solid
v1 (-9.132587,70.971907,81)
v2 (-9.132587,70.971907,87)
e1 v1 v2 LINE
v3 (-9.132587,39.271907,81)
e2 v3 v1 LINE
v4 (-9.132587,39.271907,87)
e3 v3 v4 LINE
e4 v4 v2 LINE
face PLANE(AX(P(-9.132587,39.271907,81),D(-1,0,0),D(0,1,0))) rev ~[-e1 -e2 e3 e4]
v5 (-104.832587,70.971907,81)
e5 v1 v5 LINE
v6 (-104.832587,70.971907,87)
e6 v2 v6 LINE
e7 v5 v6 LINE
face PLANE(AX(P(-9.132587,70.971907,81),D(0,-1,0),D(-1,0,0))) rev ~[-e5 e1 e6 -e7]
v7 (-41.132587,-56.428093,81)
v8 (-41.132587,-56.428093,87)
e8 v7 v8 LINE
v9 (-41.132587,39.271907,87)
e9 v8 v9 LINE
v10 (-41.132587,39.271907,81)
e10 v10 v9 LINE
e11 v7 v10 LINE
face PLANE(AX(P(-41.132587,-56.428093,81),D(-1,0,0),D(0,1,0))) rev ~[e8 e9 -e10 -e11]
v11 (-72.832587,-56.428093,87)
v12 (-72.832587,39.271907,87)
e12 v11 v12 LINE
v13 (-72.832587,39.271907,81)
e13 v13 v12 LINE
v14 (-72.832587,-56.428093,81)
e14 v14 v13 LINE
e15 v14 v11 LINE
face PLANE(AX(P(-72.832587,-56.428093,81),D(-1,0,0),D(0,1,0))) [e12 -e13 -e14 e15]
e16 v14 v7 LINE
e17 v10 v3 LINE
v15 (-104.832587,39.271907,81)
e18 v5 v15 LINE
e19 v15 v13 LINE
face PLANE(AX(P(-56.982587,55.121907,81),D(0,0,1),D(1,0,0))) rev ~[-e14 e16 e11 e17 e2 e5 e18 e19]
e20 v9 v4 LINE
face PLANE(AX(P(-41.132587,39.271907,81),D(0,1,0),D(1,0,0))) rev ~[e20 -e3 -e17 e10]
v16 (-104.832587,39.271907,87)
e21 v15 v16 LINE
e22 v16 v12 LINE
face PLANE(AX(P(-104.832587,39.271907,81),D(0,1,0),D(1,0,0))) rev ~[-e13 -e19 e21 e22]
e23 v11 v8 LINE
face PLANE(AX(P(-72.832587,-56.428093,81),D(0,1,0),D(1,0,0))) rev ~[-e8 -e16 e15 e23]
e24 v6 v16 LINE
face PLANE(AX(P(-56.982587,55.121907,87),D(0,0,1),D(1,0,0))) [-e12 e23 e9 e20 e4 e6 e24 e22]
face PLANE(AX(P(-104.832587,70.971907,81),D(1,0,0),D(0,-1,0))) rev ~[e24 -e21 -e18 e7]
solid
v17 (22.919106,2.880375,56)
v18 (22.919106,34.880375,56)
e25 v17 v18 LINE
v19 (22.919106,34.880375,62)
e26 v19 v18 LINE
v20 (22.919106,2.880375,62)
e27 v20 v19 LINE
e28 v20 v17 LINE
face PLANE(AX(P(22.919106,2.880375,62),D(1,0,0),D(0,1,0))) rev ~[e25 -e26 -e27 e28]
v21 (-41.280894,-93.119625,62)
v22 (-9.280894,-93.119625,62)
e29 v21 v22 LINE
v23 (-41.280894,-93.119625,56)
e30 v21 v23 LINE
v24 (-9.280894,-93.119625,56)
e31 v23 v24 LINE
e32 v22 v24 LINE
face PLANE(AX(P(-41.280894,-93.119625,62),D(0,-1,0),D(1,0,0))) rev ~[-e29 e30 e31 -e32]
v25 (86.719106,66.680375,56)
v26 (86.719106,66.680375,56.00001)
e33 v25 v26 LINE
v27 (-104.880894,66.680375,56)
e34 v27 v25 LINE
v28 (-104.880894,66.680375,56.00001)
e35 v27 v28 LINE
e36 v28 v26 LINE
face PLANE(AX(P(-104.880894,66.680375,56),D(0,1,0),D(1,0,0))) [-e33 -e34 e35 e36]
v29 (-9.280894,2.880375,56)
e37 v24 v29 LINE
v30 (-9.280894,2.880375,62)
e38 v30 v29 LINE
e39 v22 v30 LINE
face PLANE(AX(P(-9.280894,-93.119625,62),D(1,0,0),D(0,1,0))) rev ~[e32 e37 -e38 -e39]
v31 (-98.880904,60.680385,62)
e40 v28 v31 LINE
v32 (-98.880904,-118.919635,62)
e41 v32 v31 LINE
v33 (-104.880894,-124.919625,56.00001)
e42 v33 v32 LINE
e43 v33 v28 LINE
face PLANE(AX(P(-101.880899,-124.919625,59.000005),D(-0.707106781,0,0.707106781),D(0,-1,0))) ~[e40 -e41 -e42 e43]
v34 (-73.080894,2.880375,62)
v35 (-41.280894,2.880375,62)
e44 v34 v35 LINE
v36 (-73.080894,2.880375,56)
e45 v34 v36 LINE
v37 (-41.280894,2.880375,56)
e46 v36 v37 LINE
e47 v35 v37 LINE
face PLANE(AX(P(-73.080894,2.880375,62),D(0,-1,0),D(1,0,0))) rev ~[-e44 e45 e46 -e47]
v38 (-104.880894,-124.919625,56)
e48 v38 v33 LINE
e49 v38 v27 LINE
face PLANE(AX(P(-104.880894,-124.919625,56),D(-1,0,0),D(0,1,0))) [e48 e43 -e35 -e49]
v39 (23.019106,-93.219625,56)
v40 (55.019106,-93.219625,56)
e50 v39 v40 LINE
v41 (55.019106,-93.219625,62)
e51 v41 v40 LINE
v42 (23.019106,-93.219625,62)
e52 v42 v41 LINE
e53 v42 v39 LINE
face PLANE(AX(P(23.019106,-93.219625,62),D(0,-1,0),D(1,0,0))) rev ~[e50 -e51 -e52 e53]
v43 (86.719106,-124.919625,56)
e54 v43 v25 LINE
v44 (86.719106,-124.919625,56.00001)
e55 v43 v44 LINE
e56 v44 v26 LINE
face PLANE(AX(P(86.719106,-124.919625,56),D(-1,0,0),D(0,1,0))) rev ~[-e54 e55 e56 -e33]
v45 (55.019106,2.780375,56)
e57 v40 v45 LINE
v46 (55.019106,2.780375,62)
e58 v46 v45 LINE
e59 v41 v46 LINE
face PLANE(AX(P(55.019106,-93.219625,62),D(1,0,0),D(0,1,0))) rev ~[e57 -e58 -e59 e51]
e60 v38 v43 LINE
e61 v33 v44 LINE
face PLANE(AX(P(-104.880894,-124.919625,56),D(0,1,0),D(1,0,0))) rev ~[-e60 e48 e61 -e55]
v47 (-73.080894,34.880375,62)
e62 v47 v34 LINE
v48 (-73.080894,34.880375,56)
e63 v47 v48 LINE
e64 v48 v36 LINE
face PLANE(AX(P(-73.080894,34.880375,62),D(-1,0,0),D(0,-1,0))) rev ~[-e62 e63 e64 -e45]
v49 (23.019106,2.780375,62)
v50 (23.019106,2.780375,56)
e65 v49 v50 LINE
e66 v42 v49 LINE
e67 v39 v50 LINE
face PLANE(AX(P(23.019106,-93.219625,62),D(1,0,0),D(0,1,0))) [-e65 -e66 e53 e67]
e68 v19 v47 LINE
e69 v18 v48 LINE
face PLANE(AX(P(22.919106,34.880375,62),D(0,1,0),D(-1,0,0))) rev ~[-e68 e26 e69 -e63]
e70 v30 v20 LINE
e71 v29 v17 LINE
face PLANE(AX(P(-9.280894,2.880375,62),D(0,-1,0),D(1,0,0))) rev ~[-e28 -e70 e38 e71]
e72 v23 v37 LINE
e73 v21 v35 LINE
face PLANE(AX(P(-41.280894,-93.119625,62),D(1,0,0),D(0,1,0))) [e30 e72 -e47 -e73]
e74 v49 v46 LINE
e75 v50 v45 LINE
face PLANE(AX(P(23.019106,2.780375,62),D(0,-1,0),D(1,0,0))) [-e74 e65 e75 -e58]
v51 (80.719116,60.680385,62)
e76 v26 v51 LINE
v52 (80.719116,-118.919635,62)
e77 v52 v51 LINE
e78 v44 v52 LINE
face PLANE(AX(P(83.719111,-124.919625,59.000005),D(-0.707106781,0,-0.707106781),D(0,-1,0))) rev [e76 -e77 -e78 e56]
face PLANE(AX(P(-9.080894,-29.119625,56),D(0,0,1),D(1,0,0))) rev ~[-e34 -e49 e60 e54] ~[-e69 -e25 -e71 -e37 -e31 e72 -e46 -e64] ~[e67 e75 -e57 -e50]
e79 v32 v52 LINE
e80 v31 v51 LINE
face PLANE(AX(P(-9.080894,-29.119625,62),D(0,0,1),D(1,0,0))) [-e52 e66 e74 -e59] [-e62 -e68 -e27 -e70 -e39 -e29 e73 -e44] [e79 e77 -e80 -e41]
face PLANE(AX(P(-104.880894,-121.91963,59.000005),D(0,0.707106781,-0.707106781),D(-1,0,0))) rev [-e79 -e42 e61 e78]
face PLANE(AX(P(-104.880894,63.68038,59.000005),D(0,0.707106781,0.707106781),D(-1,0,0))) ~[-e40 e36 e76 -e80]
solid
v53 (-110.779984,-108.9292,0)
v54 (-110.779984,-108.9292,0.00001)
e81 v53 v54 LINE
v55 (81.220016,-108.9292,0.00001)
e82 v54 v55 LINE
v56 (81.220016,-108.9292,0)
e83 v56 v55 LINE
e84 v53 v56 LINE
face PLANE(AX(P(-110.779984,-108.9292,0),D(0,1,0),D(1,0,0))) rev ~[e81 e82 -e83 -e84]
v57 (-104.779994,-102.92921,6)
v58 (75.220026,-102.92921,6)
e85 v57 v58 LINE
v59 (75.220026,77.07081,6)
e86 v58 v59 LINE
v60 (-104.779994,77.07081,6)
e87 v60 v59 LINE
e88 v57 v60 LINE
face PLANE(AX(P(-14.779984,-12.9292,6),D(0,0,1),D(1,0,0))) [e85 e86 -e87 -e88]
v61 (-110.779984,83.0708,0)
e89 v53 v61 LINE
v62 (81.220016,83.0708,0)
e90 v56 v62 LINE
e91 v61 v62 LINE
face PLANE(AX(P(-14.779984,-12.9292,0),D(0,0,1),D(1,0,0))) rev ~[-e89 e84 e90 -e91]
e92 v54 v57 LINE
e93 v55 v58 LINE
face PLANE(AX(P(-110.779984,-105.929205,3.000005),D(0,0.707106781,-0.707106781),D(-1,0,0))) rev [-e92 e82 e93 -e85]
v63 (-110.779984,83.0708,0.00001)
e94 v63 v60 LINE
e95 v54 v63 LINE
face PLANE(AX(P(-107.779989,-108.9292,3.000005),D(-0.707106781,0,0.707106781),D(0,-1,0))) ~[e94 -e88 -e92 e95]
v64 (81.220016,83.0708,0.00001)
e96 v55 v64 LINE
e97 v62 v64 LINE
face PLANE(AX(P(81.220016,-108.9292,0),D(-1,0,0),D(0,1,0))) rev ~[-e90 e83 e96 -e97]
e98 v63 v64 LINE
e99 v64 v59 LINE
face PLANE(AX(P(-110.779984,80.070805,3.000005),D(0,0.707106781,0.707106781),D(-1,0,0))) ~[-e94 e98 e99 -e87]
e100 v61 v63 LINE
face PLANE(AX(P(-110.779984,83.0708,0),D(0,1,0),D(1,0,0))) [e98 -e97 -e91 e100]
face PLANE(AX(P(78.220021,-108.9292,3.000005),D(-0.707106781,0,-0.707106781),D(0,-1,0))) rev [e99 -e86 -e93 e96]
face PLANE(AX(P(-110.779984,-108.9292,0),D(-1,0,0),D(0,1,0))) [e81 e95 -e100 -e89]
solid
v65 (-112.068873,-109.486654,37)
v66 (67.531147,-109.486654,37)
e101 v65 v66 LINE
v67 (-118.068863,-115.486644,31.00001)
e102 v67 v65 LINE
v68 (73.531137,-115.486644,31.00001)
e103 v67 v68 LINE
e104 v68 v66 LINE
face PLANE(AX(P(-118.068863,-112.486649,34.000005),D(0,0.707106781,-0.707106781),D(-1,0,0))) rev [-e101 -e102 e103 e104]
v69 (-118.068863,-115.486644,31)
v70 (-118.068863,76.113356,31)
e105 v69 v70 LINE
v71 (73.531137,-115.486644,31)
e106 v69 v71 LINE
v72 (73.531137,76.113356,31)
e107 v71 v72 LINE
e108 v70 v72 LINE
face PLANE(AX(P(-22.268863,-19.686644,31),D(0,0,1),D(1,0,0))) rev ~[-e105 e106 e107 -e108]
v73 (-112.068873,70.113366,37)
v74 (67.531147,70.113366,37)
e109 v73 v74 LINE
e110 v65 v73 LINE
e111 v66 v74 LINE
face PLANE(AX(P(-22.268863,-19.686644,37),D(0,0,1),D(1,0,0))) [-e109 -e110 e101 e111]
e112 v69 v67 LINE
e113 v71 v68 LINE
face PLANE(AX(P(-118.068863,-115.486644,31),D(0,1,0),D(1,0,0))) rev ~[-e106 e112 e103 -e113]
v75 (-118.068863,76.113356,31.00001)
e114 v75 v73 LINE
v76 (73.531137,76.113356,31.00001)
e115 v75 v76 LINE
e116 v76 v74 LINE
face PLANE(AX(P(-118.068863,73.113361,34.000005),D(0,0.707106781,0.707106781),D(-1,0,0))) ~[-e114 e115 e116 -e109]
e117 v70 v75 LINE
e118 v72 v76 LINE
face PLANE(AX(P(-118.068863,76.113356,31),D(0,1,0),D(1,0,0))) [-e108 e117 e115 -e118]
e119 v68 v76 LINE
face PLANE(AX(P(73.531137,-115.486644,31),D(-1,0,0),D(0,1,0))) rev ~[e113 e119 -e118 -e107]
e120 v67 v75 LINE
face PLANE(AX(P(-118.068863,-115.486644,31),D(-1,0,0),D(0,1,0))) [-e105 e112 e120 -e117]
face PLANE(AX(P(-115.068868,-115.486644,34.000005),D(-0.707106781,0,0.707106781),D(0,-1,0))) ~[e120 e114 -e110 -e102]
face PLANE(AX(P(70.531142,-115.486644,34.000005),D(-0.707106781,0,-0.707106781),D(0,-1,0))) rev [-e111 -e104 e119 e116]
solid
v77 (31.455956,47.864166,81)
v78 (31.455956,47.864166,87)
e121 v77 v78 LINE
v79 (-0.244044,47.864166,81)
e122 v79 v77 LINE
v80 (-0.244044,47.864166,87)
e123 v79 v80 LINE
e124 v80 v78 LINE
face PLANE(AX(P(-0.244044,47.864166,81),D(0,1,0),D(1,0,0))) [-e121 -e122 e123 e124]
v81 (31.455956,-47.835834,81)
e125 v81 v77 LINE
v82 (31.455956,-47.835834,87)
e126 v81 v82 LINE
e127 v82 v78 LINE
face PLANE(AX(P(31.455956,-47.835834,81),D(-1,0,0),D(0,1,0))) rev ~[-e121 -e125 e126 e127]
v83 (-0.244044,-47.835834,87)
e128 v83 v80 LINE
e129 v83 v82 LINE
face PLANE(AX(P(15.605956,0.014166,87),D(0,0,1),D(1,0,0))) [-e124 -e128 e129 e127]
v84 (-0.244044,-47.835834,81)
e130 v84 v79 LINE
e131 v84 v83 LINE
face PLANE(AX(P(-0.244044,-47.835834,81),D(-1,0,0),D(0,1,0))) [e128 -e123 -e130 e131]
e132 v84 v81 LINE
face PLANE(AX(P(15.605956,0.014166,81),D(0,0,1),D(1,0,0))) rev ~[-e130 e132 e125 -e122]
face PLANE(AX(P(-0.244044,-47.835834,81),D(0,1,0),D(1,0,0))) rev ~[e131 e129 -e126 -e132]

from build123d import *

# Parameters (mm, degrees)
F0_W      = 192
F0_H      = 192
F1_DEPTH  = 6
F2_SIZE   = 5.99999
F4_W      = 191.6
F4_H      = 191.6
F5_DEPTH  = 6
F6_SIZE   = 5.99999
F8_W      = 191.6
F8_H      = 191.6
F9_DEPTH  = 6
F10_SIZE  = 5.99999
F11_W     = 32
F11_H     = 96
F12_DEPTH = 25
F13_W     = 32
F13_H     = 96
F14_DEPTH = 62.001
F16_W     = 31.7
F16_H     = 95.7
F17_DEPTH = 6


# Not quite as in the source:
# - a fillet or chamfer is up to 0.001 mm smaller than in the source, because OpenCascade refuses the exact size


with BuildPart() as f1:
    # F0 (on Top) → F1 (new body)
    with BuildSketch(Plane.XY):
        with Locations((-14.7799842507, -12.9291996509)):
            Rectangle(F0_W, F0_H)
    extrude(amount=F1_DEPTH)

    # F2 (size 6 in the source; OpenCascade refuses exactly that, so slightly less here)
    f2_edges = [f1.edges().sort_by_distance(p)[0] for p in [
        (-14.779984, 83.0708, 6),
        (-110.779984, -12.9292, 6),
        (-14.779984, -108.9292, 6),
        (81.220016, -12.9292, 6),
    ]]
    chamfer(f2_edges, length=F2_SIZE)


with BuildPart() as f5:
    # F4 (on offset) → F5 (new body)
    with BuildSketch(Plane.XY.offset(31)):
        with Locations((-22.2688633949, -19.6866440775)):
            Rectangle(F4_W, F4_H)
    extrude(amount=F5_DEPTH)

    # F6 (size 6 in the source; OpenCascade refuses exactly that, so slightly less here)
    f6_edges = [f5.edges().sort_by_distance(p)[0] for p in [
        (-22.268863, 76.113356, 37),
        (-118.068863, -19.686644, 37),
        (-22.268863, -115.486644, 37),
        (73.531137, -19.686644, 37),
    ]]
    chamfer(f6_edges, length=F6_SIZE)


with BuildPart() as f9:
    # F8 (on offset) → F9 (new body)
    with BuildSketch(Plane.XY.offset(56)):
        with Locations((-9.0808942914, -29.1196251102)):
            Rectangle(F8_W, F8_H)
    extrude(amount=F9_DEPTH)

    # F10 (size 6 in the source; OpenCascade refuses exactly that, so slightly less here)
    f10_edges = [f9.edges().sort_by_distance(p)[0] for p in [
        (86.719106, -29.119625, 62),
        (-9.080894, 66.680375, 62),
        (-104.880894, -29.119625, 62),
        (-9.080894, -124.919625, 62),
    ]]
    chamfer(f10_edges, length=F10_SIZE)

    # F11 (on face) → F12 (cut)
    with BuildSketch(Plane.XY.offset(62)):
        Polygon((22.9191057086, 34.8803748898), (-73.0808942914, 34.8803748898), (-73.0808942914, 2.8803748898), (-41.2808942914, 2.8803748898), (-9.2808942914, 2.8803748898), (22.9191057086, 2.8803748898), align=None)
        with Locations((-25.2808942914, -45.1196251102)):
            Rectangle(F11_W, F11_H)
    extrude(amount=-F12_DEPTH, mode=Mode.SUBTRACT)

    # F13 (on face) → F14 (cut, through all)
    with BuildSketch(Plane.XY.offset(62)):
        with Locations((39.0191057086, -45.2196251102)):
            Rectangle(F13_W, F13_H)
    extrude(amount=-F14_DEPTH, mode=Mode.SUBTRACT)


with BuildPart() as f17:
    # F16 (on offset) → F17 (new body)
    with BuildSketch(Plane.XY.offset(81)):
        Polygon((-9.1325868409, 70.9719068067), (-104.8325868409, 70.9719068067), (-104.8325868409, 39.2719068067), (-72.8325868409, 39.2719068067), (-41.1325868409, 39.2719068067), (-9.1325868409, 39.2719068067), align=None)
        with Locations((-56.9825868409, -8.5780931933)):
            Rectangle(F16_W, F16_H)
    extrude(amount=F17_DEPTH)


with BuildPart() as f17b:
    # F16 (on offset) → F17, piece 2 (new body)
    with BuildSketch(Plane.XY.offset(81)):
        with Locations((15.6059558275, 0.0141661112)):
            Rectangle(F16_W, F16_H)
    extrude(amount=F17_DEPTH)


solid = Compound([f1.part, f5.part, f9.part, f17.part, f17b.part])
